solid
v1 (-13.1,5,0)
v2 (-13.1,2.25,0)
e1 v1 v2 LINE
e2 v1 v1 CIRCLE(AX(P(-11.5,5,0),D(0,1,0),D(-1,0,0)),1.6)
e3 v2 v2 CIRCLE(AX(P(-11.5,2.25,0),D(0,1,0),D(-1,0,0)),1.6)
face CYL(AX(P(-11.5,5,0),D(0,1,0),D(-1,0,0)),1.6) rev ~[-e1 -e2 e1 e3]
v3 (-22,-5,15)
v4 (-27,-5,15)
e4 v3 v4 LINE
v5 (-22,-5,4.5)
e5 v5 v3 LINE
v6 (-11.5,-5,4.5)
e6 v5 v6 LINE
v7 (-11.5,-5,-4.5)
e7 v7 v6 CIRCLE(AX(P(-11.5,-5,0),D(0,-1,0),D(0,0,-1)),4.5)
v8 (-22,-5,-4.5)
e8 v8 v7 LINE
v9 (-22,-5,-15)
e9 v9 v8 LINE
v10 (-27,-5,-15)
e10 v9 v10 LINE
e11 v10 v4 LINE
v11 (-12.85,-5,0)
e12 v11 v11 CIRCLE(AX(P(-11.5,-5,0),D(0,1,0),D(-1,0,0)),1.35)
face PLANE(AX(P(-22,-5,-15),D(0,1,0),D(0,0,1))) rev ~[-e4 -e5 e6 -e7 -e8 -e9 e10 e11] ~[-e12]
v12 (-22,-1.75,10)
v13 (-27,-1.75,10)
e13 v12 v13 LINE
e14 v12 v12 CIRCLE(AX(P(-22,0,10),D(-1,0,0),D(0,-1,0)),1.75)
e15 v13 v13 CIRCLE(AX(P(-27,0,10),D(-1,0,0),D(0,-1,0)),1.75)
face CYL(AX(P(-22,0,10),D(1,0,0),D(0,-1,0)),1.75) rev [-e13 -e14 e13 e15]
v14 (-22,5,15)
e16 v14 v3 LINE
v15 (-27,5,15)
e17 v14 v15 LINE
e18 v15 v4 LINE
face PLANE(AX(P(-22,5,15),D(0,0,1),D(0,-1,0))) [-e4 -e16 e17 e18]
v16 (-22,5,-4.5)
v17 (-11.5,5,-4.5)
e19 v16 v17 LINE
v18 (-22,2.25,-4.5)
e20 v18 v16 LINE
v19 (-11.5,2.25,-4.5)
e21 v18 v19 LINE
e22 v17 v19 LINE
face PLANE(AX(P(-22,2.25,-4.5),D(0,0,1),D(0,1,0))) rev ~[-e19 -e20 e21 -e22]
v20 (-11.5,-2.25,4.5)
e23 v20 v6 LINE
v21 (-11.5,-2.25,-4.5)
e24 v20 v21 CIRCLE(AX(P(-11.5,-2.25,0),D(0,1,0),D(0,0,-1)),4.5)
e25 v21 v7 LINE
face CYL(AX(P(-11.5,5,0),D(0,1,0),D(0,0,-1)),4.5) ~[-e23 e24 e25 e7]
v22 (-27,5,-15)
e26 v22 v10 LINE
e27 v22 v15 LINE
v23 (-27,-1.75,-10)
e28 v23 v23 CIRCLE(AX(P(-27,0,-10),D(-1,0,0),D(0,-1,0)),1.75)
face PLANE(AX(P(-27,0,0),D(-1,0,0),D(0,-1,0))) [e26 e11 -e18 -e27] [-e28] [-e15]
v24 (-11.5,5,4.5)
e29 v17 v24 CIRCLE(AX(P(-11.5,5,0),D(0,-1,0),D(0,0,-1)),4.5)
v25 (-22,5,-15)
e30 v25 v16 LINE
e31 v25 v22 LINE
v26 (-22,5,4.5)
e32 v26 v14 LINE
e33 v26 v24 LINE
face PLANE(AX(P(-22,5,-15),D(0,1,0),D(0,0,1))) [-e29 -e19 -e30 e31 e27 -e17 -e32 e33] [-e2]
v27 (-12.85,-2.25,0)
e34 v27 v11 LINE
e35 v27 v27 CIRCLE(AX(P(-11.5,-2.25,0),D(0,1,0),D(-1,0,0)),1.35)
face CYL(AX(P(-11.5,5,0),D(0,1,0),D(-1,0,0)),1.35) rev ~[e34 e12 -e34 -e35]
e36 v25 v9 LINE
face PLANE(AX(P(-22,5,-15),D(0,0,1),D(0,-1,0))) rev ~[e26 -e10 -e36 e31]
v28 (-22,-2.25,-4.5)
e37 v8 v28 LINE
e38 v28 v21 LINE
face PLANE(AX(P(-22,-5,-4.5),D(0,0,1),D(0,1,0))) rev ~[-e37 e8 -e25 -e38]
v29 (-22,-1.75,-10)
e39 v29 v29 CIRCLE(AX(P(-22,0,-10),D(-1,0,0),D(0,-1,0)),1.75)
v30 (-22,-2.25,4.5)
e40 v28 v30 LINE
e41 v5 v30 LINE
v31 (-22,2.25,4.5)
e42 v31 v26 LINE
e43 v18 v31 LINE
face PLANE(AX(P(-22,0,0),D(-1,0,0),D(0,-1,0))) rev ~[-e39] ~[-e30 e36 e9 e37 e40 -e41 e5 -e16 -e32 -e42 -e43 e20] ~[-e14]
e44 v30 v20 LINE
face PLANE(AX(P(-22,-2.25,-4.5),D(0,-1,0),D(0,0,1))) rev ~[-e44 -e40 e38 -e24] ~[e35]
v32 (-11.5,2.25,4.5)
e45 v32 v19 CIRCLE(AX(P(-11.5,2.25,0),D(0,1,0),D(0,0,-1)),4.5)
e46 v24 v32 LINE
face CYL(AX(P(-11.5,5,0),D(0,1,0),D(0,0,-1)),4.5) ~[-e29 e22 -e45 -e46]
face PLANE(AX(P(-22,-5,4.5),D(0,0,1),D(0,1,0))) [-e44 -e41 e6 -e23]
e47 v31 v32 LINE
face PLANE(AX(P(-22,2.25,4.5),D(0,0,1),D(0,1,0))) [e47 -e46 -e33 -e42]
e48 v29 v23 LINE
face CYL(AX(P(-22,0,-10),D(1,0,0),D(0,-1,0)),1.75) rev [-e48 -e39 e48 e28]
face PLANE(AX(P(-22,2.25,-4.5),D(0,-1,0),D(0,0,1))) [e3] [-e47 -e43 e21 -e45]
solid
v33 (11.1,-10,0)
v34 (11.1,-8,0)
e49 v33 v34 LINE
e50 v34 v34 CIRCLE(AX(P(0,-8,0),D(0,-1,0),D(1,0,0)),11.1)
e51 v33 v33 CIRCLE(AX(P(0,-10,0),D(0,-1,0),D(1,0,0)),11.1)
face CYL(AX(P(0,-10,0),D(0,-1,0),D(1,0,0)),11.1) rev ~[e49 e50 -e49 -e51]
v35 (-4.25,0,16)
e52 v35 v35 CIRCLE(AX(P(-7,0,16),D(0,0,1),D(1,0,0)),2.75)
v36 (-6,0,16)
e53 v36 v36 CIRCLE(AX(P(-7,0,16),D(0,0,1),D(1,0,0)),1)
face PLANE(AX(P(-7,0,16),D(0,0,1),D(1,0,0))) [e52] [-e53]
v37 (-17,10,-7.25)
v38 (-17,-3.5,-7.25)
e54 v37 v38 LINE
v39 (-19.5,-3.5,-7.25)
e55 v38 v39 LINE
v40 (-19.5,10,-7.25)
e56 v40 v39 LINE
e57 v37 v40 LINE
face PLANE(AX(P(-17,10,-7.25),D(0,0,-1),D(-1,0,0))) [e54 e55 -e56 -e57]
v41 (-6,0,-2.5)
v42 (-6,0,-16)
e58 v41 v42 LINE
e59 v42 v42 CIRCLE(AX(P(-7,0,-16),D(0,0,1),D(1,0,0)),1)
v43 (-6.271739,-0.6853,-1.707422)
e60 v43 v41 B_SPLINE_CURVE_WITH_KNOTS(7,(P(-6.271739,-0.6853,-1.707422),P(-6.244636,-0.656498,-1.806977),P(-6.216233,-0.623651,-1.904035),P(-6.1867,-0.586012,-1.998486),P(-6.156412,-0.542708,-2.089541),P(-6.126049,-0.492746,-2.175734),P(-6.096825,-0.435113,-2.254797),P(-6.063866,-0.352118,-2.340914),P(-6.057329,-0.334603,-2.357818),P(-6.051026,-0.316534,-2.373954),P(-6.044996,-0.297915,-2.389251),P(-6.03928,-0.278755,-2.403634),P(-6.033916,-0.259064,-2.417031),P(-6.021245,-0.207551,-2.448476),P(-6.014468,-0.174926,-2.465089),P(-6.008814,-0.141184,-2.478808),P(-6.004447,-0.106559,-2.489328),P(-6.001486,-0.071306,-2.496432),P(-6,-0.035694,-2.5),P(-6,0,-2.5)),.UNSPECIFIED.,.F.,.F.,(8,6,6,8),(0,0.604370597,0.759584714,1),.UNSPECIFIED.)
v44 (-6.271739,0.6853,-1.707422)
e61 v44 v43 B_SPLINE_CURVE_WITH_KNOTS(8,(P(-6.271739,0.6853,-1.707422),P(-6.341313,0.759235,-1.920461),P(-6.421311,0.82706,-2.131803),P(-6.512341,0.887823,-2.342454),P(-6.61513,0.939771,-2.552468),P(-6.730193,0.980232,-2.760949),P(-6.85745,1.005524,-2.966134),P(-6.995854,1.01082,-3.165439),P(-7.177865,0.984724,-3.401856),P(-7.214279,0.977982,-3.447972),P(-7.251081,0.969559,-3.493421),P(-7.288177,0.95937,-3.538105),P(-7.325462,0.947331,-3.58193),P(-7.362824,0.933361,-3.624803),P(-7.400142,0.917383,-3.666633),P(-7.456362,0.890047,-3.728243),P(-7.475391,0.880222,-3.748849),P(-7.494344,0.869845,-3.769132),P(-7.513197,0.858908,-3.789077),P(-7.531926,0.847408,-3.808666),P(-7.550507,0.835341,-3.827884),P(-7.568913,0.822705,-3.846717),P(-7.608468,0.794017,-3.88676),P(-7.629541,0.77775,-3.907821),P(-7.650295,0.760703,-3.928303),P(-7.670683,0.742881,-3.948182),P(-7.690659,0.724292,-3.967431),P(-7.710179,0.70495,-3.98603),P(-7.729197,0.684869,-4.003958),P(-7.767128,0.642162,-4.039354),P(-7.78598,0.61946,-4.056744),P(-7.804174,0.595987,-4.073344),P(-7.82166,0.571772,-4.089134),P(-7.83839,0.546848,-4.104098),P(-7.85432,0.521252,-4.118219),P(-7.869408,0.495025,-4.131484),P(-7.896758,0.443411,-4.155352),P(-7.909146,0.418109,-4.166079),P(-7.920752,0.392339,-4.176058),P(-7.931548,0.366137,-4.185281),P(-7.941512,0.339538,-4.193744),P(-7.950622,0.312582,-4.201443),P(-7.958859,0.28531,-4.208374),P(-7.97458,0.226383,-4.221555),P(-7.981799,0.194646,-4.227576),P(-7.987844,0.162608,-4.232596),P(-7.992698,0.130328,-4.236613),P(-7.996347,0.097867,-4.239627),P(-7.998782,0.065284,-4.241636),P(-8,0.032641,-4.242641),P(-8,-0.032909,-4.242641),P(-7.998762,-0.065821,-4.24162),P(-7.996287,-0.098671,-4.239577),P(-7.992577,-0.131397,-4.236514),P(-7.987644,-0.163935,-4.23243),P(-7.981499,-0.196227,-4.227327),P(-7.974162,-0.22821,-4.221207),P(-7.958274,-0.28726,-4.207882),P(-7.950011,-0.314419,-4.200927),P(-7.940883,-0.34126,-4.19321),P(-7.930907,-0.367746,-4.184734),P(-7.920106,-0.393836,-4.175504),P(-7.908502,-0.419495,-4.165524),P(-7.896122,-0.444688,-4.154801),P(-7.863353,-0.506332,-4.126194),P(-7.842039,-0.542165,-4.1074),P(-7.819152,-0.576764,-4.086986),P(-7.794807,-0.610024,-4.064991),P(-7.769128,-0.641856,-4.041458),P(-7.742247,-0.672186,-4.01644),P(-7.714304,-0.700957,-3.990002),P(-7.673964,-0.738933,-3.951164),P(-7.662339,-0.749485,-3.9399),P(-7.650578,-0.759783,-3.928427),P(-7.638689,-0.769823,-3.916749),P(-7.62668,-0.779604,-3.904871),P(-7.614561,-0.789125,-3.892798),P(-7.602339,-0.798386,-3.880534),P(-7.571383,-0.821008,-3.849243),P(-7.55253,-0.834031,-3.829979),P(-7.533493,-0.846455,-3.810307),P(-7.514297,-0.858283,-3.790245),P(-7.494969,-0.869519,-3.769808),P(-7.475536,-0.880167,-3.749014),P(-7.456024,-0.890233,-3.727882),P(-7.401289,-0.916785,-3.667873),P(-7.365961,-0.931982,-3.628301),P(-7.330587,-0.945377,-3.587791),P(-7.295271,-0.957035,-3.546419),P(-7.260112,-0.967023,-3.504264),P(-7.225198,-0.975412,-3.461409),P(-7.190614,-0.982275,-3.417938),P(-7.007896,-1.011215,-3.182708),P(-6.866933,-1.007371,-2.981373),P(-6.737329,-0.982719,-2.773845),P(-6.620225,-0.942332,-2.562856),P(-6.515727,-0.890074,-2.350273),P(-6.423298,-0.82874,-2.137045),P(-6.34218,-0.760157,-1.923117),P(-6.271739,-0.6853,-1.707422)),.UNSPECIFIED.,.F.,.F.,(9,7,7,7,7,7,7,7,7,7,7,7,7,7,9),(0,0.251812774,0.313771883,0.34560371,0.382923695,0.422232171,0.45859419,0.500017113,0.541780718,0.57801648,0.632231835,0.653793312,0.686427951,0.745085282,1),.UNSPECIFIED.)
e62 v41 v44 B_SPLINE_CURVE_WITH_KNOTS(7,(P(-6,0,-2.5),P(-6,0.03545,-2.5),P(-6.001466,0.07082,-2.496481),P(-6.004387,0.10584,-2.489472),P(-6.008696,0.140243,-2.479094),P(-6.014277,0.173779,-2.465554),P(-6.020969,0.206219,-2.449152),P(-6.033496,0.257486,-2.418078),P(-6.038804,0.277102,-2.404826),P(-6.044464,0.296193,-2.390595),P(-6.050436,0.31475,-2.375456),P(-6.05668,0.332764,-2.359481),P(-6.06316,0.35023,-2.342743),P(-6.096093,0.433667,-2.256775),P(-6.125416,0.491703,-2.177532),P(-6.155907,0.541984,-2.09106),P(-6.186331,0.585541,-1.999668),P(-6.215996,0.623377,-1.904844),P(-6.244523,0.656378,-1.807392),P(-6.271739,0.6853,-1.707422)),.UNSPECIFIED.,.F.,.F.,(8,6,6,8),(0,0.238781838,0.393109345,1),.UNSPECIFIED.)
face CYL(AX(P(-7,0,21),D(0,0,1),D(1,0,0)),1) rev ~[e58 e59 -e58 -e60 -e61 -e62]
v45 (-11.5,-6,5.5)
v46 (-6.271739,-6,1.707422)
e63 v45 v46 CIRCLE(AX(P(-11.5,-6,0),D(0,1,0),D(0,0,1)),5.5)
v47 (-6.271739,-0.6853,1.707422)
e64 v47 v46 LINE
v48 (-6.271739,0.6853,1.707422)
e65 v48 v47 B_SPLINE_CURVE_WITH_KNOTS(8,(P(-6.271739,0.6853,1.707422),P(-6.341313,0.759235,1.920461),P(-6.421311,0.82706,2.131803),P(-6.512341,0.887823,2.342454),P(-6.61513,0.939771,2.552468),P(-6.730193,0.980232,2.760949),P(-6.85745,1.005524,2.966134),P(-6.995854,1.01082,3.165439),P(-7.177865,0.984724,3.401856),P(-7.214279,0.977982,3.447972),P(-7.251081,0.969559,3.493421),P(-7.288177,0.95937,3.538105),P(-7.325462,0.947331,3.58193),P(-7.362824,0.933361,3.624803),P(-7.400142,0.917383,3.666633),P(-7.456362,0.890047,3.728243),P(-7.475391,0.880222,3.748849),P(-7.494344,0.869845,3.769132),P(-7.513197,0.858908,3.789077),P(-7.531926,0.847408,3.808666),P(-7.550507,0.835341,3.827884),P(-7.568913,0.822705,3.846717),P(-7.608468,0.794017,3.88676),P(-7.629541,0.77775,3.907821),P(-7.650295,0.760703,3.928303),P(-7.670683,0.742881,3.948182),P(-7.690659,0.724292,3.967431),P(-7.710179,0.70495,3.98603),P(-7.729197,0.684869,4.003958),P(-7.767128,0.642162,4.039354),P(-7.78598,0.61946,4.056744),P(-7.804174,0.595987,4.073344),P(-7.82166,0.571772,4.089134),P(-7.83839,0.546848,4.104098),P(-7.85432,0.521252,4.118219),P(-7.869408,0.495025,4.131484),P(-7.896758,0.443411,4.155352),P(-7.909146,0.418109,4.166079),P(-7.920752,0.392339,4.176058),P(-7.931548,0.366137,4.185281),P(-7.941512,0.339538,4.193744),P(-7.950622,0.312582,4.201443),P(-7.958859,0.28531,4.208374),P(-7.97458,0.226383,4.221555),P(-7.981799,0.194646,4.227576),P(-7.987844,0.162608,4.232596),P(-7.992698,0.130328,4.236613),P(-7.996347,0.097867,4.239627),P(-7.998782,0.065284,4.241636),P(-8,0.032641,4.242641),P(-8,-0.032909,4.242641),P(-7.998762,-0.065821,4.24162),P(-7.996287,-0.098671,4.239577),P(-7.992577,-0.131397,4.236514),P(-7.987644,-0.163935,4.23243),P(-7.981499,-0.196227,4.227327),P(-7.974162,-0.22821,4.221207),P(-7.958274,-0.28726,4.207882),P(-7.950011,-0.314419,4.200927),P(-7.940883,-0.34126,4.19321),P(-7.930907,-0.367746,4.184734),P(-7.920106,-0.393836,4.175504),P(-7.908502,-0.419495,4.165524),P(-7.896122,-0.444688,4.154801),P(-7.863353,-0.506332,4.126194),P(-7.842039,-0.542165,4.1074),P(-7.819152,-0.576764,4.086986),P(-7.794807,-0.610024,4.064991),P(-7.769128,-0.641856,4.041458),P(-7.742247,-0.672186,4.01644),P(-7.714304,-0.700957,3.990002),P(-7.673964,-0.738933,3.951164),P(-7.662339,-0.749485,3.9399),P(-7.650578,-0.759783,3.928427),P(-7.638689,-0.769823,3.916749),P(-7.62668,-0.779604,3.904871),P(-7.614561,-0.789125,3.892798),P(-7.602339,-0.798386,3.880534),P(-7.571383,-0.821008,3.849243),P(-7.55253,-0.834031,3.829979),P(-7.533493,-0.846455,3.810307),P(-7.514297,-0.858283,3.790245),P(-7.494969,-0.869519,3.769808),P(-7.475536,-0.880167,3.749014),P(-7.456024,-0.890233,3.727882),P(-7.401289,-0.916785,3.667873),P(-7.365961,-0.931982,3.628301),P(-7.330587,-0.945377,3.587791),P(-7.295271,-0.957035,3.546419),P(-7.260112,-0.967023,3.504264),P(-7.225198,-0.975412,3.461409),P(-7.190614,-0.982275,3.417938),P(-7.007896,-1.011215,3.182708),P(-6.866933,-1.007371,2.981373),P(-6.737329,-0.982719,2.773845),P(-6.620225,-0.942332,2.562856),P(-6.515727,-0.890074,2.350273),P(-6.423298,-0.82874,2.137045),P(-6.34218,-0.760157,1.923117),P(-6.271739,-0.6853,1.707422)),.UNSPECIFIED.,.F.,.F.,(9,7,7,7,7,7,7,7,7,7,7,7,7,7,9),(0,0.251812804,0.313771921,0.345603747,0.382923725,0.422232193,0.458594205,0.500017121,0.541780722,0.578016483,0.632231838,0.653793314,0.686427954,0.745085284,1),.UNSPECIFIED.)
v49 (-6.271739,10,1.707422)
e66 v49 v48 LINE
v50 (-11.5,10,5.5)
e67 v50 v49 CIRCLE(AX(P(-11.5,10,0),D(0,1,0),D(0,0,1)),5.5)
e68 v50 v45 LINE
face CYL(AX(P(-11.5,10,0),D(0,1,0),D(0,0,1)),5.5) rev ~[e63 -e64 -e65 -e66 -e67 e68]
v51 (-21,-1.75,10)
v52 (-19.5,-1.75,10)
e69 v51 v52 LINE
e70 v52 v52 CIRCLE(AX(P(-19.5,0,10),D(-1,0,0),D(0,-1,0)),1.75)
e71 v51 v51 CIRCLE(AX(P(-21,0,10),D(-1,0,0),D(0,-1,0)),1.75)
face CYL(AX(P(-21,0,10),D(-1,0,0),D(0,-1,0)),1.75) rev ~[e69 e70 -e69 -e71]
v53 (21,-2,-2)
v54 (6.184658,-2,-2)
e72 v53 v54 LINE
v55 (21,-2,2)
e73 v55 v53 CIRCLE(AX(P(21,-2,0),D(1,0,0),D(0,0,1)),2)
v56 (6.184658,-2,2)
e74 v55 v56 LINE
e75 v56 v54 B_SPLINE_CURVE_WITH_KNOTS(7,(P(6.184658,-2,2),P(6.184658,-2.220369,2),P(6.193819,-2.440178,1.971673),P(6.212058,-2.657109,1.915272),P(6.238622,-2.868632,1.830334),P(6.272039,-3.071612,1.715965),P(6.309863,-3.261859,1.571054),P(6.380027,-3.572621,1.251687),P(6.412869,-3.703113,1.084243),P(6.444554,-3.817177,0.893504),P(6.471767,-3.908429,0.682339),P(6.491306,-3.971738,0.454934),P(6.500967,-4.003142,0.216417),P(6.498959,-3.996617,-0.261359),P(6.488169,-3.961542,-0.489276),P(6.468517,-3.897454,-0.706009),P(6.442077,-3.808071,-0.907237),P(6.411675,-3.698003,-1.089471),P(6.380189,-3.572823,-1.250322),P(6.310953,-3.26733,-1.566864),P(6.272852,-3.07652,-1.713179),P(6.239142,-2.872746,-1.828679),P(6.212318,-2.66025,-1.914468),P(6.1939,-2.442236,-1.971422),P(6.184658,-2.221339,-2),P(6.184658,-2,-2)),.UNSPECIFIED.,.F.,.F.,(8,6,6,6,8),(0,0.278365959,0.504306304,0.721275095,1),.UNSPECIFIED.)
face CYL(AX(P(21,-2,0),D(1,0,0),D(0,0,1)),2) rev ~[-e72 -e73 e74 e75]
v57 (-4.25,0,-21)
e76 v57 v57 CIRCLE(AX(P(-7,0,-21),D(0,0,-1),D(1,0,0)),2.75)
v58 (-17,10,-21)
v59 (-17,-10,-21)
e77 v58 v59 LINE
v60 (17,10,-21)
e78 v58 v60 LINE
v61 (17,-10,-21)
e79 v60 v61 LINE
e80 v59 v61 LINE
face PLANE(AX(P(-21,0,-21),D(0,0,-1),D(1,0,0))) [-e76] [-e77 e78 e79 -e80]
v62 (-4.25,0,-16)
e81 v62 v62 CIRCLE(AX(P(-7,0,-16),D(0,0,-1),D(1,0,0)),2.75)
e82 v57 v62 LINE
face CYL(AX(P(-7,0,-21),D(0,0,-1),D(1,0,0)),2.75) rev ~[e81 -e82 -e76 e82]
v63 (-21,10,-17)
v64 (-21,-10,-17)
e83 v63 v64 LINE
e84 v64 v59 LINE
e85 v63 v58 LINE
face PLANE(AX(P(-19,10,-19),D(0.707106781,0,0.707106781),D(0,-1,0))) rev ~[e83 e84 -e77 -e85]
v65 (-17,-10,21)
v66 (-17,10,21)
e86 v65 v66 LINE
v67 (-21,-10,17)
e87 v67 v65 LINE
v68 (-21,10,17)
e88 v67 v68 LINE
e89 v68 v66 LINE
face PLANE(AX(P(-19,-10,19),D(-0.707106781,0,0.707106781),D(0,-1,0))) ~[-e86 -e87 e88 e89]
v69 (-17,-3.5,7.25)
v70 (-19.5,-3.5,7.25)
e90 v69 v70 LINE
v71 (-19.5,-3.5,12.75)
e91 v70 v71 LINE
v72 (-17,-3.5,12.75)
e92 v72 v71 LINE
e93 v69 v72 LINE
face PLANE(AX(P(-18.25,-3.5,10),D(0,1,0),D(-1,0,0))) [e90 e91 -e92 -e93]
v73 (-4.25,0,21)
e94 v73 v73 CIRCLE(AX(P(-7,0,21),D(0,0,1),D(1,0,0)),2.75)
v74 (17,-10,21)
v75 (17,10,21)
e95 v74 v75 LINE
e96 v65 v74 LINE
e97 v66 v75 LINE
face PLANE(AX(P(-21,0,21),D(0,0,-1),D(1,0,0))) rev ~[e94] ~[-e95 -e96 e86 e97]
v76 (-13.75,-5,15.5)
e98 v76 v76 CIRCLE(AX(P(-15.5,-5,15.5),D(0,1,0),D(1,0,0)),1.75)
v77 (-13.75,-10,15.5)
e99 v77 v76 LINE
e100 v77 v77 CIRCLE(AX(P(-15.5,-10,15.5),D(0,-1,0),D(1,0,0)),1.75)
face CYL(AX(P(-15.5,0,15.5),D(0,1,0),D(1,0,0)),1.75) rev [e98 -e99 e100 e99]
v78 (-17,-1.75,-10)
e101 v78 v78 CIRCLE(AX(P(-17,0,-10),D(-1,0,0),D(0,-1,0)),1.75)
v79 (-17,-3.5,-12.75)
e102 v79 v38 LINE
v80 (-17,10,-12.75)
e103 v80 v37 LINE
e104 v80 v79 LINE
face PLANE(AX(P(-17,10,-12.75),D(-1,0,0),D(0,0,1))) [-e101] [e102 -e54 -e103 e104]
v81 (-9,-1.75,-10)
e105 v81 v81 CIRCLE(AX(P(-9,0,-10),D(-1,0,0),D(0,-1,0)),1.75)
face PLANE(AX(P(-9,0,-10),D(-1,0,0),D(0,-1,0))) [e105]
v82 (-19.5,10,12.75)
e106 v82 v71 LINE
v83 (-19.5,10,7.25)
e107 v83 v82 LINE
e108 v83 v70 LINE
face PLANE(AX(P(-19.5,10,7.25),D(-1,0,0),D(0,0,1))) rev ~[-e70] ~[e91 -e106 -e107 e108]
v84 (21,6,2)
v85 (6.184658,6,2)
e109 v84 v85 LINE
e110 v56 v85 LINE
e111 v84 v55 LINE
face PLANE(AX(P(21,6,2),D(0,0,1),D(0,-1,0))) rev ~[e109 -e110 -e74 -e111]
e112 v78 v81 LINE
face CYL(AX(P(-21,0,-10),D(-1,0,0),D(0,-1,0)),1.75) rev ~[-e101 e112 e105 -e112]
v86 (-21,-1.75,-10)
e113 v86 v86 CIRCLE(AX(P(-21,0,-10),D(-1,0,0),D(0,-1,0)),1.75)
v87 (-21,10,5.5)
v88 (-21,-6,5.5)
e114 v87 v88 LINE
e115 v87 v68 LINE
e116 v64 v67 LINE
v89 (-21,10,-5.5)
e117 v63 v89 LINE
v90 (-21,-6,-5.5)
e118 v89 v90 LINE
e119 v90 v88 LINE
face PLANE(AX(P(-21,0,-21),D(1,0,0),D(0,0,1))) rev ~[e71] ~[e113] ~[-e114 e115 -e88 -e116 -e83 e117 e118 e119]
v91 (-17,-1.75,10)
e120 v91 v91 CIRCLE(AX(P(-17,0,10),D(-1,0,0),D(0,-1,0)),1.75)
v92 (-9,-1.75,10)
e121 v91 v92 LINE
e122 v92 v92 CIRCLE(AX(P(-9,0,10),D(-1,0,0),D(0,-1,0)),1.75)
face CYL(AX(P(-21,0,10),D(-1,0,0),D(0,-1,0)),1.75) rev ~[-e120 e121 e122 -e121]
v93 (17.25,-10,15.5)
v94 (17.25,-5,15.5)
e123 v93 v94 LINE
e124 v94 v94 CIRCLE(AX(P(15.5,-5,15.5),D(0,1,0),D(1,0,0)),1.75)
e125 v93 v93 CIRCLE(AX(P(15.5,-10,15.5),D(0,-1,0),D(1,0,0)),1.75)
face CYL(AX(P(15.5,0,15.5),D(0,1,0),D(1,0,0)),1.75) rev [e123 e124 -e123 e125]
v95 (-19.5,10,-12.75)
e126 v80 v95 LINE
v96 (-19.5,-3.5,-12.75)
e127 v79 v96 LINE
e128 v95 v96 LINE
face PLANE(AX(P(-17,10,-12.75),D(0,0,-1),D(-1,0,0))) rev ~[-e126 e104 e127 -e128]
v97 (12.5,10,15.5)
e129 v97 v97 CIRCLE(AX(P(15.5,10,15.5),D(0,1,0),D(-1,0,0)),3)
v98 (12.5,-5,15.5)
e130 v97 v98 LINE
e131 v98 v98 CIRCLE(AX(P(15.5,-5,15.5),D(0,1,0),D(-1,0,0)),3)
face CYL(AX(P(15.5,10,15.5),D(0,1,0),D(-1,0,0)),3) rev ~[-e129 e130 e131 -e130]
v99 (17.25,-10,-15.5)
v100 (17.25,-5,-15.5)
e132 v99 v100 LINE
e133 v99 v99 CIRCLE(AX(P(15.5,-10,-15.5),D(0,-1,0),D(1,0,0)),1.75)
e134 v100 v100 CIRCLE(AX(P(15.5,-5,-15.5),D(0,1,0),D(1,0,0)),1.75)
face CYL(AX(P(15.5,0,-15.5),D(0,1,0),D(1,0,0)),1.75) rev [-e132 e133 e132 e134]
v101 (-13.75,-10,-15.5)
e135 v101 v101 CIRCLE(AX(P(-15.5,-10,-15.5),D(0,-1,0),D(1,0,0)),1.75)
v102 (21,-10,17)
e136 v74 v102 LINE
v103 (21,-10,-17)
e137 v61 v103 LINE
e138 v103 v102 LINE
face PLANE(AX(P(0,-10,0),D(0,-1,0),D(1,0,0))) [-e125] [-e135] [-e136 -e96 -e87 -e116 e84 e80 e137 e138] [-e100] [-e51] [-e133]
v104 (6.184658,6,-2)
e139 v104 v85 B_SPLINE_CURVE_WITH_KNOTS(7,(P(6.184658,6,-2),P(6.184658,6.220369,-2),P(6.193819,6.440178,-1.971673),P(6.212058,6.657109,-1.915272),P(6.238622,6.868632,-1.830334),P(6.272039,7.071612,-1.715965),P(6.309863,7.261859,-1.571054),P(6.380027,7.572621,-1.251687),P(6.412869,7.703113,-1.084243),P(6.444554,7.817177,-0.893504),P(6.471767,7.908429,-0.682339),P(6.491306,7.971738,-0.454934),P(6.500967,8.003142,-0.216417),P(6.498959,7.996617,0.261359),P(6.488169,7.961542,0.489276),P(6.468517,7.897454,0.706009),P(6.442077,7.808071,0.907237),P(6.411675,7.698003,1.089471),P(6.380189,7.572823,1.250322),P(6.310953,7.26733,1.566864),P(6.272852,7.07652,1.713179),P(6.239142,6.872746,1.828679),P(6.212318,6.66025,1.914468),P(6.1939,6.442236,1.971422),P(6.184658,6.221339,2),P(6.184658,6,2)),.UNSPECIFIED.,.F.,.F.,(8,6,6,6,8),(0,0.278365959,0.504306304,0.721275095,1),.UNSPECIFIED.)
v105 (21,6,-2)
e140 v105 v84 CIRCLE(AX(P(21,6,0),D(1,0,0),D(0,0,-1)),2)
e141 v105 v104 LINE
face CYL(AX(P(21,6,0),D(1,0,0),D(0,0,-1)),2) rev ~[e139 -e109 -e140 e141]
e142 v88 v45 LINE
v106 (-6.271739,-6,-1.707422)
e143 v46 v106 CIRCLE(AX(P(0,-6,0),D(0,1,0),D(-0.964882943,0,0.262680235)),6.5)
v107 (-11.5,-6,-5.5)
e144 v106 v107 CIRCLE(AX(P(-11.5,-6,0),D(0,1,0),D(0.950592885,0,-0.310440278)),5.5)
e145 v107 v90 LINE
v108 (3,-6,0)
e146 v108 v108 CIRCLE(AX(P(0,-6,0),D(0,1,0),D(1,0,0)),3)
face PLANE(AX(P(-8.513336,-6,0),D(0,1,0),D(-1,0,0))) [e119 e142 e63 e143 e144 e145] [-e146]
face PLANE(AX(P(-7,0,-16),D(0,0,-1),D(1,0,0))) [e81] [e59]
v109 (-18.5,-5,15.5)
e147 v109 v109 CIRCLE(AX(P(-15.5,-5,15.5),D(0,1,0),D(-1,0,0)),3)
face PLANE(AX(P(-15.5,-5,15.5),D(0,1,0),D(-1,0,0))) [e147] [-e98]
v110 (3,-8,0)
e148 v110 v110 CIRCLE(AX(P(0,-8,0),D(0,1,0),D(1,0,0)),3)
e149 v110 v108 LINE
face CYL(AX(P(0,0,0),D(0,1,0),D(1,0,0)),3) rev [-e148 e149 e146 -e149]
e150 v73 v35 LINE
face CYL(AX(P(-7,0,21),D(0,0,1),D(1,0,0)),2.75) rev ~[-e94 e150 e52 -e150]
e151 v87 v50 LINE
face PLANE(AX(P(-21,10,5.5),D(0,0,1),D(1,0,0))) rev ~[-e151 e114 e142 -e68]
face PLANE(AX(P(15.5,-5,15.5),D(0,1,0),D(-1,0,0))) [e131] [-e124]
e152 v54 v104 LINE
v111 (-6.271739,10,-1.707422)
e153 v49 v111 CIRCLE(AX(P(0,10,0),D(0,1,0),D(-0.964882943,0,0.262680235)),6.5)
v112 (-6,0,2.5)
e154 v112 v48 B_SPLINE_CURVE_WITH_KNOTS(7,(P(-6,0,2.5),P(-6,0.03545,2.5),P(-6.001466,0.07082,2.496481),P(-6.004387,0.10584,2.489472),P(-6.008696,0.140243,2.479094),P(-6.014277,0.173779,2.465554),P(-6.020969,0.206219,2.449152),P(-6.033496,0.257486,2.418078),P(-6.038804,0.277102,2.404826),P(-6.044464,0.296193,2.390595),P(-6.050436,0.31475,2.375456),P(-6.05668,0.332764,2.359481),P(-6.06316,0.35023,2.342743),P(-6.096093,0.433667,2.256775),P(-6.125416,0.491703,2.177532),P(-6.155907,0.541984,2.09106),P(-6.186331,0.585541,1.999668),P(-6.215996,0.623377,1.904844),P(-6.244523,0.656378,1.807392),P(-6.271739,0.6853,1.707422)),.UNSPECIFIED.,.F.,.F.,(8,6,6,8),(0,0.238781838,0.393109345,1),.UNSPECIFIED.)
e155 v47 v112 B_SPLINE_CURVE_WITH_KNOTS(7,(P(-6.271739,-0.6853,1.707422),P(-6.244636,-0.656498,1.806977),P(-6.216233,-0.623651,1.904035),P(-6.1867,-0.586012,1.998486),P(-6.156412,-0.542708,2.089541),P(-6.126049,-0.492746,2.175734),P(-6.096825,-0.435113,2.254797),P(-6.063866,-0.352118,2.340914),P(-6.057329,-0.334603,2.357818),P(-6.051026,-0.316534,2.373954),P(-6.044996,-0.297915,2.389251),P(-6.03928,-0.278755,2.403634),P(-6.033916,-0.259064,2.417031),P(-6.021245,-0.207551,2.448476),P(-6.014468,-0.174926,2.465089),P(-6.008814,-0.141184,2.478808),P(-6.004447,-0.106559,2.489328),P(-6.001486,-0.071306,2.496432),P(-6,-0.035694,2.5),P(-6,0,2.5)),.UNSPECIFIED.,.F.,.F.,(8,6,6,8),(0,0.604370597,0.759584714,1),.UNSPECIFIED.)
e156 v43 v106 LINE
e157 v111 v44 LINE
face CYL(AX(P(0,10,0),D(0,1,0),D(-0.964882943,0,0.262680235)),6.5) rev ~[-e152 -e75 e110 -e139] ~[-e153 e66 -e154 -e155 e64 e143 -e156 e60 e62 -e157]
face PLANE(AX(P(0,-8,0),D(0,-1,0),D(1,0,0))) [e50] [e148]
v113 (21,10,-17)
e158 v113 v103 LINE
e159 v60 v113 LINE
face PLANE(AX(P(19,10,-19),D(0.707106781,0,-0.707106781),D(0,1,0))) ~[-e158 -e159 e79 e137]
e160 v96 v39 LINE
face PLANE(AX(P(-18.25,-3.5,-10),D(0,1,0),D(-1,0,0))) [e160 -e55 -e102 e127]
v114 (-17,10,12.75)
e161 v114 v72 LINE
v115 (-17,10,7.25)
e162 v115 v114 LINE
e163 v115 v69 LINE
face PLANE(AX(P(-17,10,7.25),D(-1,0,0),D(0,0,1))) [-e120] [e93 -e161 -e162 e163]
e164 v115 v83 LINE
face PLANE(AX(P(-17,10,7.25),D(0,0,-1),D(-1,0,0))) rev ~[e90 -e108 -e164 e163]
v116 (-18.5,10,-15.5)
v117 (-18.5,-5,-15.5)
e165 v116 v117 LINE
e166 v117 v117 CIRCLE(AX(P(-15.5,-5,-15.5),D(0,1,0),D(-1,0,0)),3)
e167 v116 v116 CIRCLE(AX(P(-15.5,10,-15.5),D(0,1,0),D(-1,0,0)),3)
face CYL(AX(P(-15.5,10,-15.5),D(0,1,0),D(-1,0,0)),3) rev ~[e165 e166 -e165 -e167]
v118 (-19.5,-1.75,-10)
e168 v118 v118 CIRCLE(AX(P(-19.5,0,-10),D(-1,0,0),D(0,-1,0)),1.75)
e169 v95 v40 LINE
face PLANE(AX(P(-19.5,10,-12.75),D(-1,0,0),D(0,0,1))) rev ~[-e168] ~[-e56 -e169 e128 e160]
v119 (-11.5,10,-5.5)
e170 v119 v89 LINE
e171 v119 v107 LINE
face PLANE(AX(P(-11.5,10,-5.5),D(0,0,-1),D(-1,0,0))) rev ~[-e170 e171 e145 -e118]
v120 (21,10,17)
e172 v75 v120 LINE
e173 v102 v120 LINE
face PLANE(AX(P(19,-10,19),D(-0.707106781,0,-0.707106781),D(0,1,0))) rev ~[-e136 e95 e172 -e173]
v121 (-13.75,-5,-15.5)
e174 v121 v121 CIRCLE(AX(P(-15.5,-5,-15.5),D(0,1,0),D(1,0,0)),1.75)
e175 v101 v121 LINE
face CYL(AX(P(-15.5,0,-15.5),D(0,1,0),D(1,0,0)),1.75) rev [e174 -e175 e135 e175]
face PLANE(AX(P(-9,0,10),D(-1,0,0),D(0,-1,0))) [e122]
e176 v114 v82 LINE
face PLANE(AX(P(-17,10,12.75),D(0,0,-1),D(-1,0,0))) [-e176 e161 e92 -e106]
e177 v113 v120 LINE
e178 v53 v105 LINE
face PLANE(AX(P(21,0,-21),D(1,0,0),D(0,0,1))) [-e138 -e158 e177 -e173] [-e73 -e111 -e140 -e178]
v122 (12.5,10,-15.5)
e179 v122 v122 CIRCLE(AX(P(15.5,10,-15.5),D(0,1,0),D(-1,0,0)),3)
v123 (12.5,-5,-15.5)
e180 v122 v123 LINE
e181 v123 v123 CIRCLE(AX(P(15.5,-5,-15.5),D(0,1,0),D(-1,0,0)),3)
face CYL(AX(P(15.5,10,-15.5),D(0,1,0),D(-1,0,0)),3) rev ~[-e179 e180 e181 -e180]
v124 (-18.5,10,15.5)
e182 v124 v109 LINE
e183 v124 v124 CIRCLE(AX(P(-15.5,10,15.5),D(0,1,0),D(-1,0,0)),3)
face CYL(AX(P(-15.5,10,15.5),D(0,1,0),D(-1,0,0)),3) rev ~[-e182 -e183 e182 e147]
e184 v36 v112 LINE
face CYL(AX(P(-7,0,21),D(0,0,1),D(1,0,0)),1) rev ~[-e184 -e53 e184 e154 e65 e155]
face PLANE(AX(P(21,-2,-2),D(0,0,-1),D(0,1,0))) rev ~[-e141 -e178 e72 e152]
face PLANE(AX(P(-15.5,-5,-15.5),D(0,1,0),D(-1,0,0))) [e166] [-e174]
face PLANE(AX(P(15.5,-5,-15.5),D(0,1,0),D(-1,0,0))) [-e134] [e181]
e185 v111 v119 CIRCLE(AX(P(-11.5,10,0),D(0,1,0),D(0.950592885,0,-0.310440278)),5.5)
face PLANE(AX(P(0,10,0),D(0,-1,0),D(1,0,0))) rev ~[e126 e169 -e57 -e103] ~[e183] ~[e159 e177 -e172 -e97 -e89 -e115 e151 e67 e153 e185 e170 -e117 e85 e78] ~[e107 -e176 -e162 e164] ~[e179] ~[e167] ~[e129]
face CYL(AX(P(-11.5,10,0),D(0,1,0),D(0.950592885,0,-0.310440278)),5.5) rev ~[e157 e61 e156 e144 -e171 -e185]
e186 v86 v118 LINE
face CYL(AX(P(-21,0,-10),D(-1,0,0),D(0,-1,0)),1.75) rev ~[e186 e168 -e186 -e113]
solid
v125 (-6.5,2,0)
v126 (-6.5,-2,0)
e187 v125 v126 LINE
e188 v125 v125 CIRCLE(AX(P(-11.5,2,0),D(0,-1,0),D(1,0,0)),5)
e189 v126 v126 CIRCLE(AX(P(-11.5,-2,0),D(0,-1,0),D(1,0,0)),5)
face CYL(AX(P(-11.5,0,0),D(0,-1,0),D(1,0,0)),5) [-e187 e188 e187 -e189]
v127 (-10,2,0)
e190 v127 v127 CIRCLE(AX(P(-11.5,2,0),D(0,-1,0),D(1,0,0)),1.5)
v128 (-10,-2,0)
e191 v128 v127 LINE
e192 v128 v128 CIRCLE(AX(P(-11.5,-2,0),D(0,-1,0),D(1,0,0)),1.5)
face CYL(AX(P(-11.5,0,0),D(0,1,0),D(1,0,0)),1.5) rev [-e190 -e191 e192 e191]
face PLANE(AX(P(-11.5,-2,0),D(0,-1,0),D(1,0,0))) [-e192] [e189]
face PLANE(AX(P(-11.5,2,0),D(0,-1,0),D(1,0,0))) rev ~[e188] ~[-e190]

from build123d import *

# Parameters (mm, degrees)
F0_W      = 42
F0_H      = 42
F0_R      = 1.75
F0_R_2    = 3
F1_DEPTH  = 10
F2_R      = 11.1
F3_DEPTH  = 2
F4_R      = 1
F5_DEPTH  = 42
F7_DEPTH  = 16
F8_R      = 1.75
F9_DEPTH  = 12
F10_R     = 5
F10_R_2   = 1.5
F11_DEPTH = 2
F13_W     = 10
F13_H     = 30
F13_R     = 1.75
F14_DEPTH = 5
F15_W     = 2.75
F15_H     = 9
F16_DEPTH = 16
F18_DEPTH = 10
F19_R     = 2.75
F20_DEPTH = 5
F21_R     = 2.75
F22_DEPTH = 5
F23_R     = 1.35
F24_DEPTH = 10
F25_R     = 1.6
F26_DEPTH = 2.75
F27_SIZE  = 4
F28_W     = 2.5
F28_H     = 5.5
F29_DEPTH = 13.5
F31_REACH = 60.6501106407
F32_R     = 3
F33_DEPTH = 15


with BuildPart() as f1:
    # F0 (on Front) → F1 (new body, symmetric)
    with BuildSketch(Plane.XZ):
        Rectangle(F0_W, F0_H)
        with Locations((-15.5, -15.5)):
            Circle(F0_R, mode=Mode.SUBTRACT)
        with Locations((15.5, -15.5)):
            Circle(F0_R, mode=Mode.SUBTRACT)
        with Locations((-15.5, 15.5)):
            Circle(F0_R, mode=Mode.SUBTRACT)
        Circle(F0_R_2, mode=Mode.SUBTRACT)
        with Locations((15.5, 15.5)):
            Circle(F0_R, mode=Mode.SUBTRACT)
    extrude(amount=F1_DEPTH, both=True)

    # F2 (on face) → F3 (cut)
    with BuildSketch(Plane.XZ.offset(10)):
        Circle(F2_R)
    extrude(amount=-F3_DEPTH, mode=Mode.SUBTRACT)

    # F4 (on face) → F5 (cut, through all)
    with BuildSketch(Plane.XY.offset(21)):
        with Locations((-7, 0)):
            Circle(F4_R)
    extrude(amount=-F5_DEPTH, mode=Mode.SUBTRACT)

    # F6 (on face) → F7 (cut)
    with BuildSketch(Plane(origin=(0, 10, 0), x_dir=(-1, 0, 0), z_dir=(0, 1, 0))):
        with BuildLine():
            ThreePointArc((11.5, 5.5), (8.2705123017, 4.4520118156), (6.2717391304, 1.7074215296))
            ThreePointArc((6.2717391304, 1.7074215296), (-6.5, 0), (6.2717391304, -1.7074215296))
            ThreePointArc((6.2717391304, -1.7074215296), (8.2705123017, -4.4520118156), (11.5, -5.5))
            Line((11.5, -5.5), (21, -5.5))
            Line((21, -5.5), (21, 5.5))
            Line((21, 5.5), (11.5, 5.5))
        make_face()
    extrude(amount=-F7_DEPTH, mode=Mode.SUBTRACT)

    # F8 (on face) → F9 (cut)
    with BuildSketch(Plane(origin=(-21, 0, 0), x_dir=(0, -1, 0), z_dir=(-1, 0, 0))):
        with Locations((0, 10)):
            Circle(F8_R)
        with Locations((0, -10)):
            Circle(F8_R)
    extrude(amount=-F9_DEPTH, mode=Mode.SUBTRACT)

    # F19 (on face) → F20 (cut)
    with BuildSketch(Plane.XY.offset(21)):
        with Locations((-7, 0)):
            Circle(F19_R)
    extrude(amount=-F20_DEPTH, mode=Mode.SUBTRACT)

    # F21 (on face) → F22 (cut)
    with BuildSketch(Plane(origin=(0, 0, -21), x_dir=(1, 0, 0), z_dir=(0, 0, -1))):
        with Locations((-7, 0)):
            Circle(F21_R)
    extrude(amount=-F22_DEPTH, mode=Mode.SUBTRACT)

    # F27
    f27_edges = [f1.edges().sort_by_distance(p)[0] for p in [
        (21, 0, 21),
        (21, 0, -21),
        (-21, 0, -21),
        (-21, 0, 21),
    ]]
    chamfer(f27_edges, length=F27_SIZE)

    # F28 (on face) → F29 (cut)
    with BuildSketch(Plane(origin=(0, 10, 0), x_dir=(-1, 0, 0), z_dir=(0, 1, 0))):
        with Locations((18.25, 10)):
            Rectangle(F28_W, F28_H)
        with Locations((18.25, -10)):
            Rectangle(F28_W, F28_H)
    extrude(amount=-F29_DEPTH, mode=Mode.SUBTRACT)

    f31_end = f1.faces().sort_by_distance((6.5, 2, 0))[0]
    # F30 (on face) → F31 (cut, up to a face of the model that its end follows)
    with BuildSketch(Plane.YZ.offset(21)):
        with BuildLine():
            Line((6, 2), (-2, 2))
            ThreePointArc((-2, 2), (-4, 0), (-2, -2))
            Line((-2, -2), (6, -2))
            ThreePointArc((6, -2), (8, 0), (6, 2))
        make_face()
    f31_long = extrude(amount=-F31_REACH, mode=Mode.PRIVATE)
    add(split(f31_long, bisect_by=f31_end, keep=Keep.BOTTOM, mode=Mode.PRIVATE), mode=Mode.SUBTRACT)

    # F32 (on face) → F33 (cut)
    with BuildSketch(Plane(origin=(0, 10, 0), x_dir=(-1, 0, 0), z_dir=(0, 1, 0))):
        with Locations((-15.5, 15.5)):
            Circle(F32_R)
        with Locations((15.5, 15.5)):
            Circle(F32_R)
        with Locations((-15.5, -15.5)):
            Circle(F32_R)
        with Locations((15.5, -15.5)):
            Circle(F32_R)
    extrude(amount=-F33_DEPTH, mode=Mode.SUBTRACT)


with BuildPart() as f11:
    # F10 (on Front) → F11 (new body, symmetric)
    with BuildSketch(Plane.XZ):
        with Locations((-11.5, 0)):
            Circle(F10_R)
        with Locations((-11.5, 0)):
            Circle(F10_R_2, mode=Mode.SUBTRACT)
    extrude(amount=F11_DEPTH, both=True)


with BuildPart() as f14:
    # F13 (on offset) → F14 (new body)
    with BuildSketch(Plane(origin=(-22, 0, 0), x_dir=(0, -1, 0), z_dir=(-1, 0, 0))):
        Rectangle(F13_W, F13_H)
        with Locations((0, -10)):
            Circle(F13_R, mode=Mode.SUBTRACT)
        with Locations((0, 10)):
            Circle(F13_R, mode=Mode.SUBTRACT)
    extrude(amount=F14_DEPTH)

    # F15 (on face) → F16 (join)
    with BuildSketch(Plane.YZ.offset(-22)):
        with Locations((-3.625, 0)):
            Rectangle(F15_W, F15_H)
        with Locations((3.625, 0)):
            Rectangle(F15_W, F15_H)
    extrude(amount=F16_DEPTH)

    # F17 (on face) → F18 (cut, through all)
    with BuildSketch(Plane(origin=(0, 5, 0), x_dir=(-1, 0, 0), z_dir=(0, 1, 0))):
        with BuildLine():
            ThreePointArc((11.5, -4.5), (7, 0), (11.5, 4.5))
            Line((11.5, 4.5), (6, 4.5))
            Line((6, 4.5), (6, -4.5))
            Line((6, -4.5), (11.5, -4.5))
        make_face()
    extrude(amount=-F18_DEPTH, mode=Mode.SUBTRACT)

    # F23 (on face) → F24 (cut, through all)
    with BuildSketch(Plane(origin=(0, 5, 0), x_dir=(-1, 0, 0), z_dir=(0, 1, 0))):
        with Locations((11.5, 0)):
            Circle(F23_R)
    extrude(amount=-F24_DEPTH, mode=Mode.SUBTRACT)

    # F25 (on face) → F26 (cut, through all)
    with BuildSketch(Plane(origin=(0, 5, 0), x_dir=(-1, 0, 0), z_dir=(0, 1, 0))):
        with Locations((11.5, 0)):
            Circle(F25_R)
    extrude(amount=-F26_DEPTH, mode=Mode.SUBTRACT)


solid = Compound([f1.part, f11.part, f14.part])
